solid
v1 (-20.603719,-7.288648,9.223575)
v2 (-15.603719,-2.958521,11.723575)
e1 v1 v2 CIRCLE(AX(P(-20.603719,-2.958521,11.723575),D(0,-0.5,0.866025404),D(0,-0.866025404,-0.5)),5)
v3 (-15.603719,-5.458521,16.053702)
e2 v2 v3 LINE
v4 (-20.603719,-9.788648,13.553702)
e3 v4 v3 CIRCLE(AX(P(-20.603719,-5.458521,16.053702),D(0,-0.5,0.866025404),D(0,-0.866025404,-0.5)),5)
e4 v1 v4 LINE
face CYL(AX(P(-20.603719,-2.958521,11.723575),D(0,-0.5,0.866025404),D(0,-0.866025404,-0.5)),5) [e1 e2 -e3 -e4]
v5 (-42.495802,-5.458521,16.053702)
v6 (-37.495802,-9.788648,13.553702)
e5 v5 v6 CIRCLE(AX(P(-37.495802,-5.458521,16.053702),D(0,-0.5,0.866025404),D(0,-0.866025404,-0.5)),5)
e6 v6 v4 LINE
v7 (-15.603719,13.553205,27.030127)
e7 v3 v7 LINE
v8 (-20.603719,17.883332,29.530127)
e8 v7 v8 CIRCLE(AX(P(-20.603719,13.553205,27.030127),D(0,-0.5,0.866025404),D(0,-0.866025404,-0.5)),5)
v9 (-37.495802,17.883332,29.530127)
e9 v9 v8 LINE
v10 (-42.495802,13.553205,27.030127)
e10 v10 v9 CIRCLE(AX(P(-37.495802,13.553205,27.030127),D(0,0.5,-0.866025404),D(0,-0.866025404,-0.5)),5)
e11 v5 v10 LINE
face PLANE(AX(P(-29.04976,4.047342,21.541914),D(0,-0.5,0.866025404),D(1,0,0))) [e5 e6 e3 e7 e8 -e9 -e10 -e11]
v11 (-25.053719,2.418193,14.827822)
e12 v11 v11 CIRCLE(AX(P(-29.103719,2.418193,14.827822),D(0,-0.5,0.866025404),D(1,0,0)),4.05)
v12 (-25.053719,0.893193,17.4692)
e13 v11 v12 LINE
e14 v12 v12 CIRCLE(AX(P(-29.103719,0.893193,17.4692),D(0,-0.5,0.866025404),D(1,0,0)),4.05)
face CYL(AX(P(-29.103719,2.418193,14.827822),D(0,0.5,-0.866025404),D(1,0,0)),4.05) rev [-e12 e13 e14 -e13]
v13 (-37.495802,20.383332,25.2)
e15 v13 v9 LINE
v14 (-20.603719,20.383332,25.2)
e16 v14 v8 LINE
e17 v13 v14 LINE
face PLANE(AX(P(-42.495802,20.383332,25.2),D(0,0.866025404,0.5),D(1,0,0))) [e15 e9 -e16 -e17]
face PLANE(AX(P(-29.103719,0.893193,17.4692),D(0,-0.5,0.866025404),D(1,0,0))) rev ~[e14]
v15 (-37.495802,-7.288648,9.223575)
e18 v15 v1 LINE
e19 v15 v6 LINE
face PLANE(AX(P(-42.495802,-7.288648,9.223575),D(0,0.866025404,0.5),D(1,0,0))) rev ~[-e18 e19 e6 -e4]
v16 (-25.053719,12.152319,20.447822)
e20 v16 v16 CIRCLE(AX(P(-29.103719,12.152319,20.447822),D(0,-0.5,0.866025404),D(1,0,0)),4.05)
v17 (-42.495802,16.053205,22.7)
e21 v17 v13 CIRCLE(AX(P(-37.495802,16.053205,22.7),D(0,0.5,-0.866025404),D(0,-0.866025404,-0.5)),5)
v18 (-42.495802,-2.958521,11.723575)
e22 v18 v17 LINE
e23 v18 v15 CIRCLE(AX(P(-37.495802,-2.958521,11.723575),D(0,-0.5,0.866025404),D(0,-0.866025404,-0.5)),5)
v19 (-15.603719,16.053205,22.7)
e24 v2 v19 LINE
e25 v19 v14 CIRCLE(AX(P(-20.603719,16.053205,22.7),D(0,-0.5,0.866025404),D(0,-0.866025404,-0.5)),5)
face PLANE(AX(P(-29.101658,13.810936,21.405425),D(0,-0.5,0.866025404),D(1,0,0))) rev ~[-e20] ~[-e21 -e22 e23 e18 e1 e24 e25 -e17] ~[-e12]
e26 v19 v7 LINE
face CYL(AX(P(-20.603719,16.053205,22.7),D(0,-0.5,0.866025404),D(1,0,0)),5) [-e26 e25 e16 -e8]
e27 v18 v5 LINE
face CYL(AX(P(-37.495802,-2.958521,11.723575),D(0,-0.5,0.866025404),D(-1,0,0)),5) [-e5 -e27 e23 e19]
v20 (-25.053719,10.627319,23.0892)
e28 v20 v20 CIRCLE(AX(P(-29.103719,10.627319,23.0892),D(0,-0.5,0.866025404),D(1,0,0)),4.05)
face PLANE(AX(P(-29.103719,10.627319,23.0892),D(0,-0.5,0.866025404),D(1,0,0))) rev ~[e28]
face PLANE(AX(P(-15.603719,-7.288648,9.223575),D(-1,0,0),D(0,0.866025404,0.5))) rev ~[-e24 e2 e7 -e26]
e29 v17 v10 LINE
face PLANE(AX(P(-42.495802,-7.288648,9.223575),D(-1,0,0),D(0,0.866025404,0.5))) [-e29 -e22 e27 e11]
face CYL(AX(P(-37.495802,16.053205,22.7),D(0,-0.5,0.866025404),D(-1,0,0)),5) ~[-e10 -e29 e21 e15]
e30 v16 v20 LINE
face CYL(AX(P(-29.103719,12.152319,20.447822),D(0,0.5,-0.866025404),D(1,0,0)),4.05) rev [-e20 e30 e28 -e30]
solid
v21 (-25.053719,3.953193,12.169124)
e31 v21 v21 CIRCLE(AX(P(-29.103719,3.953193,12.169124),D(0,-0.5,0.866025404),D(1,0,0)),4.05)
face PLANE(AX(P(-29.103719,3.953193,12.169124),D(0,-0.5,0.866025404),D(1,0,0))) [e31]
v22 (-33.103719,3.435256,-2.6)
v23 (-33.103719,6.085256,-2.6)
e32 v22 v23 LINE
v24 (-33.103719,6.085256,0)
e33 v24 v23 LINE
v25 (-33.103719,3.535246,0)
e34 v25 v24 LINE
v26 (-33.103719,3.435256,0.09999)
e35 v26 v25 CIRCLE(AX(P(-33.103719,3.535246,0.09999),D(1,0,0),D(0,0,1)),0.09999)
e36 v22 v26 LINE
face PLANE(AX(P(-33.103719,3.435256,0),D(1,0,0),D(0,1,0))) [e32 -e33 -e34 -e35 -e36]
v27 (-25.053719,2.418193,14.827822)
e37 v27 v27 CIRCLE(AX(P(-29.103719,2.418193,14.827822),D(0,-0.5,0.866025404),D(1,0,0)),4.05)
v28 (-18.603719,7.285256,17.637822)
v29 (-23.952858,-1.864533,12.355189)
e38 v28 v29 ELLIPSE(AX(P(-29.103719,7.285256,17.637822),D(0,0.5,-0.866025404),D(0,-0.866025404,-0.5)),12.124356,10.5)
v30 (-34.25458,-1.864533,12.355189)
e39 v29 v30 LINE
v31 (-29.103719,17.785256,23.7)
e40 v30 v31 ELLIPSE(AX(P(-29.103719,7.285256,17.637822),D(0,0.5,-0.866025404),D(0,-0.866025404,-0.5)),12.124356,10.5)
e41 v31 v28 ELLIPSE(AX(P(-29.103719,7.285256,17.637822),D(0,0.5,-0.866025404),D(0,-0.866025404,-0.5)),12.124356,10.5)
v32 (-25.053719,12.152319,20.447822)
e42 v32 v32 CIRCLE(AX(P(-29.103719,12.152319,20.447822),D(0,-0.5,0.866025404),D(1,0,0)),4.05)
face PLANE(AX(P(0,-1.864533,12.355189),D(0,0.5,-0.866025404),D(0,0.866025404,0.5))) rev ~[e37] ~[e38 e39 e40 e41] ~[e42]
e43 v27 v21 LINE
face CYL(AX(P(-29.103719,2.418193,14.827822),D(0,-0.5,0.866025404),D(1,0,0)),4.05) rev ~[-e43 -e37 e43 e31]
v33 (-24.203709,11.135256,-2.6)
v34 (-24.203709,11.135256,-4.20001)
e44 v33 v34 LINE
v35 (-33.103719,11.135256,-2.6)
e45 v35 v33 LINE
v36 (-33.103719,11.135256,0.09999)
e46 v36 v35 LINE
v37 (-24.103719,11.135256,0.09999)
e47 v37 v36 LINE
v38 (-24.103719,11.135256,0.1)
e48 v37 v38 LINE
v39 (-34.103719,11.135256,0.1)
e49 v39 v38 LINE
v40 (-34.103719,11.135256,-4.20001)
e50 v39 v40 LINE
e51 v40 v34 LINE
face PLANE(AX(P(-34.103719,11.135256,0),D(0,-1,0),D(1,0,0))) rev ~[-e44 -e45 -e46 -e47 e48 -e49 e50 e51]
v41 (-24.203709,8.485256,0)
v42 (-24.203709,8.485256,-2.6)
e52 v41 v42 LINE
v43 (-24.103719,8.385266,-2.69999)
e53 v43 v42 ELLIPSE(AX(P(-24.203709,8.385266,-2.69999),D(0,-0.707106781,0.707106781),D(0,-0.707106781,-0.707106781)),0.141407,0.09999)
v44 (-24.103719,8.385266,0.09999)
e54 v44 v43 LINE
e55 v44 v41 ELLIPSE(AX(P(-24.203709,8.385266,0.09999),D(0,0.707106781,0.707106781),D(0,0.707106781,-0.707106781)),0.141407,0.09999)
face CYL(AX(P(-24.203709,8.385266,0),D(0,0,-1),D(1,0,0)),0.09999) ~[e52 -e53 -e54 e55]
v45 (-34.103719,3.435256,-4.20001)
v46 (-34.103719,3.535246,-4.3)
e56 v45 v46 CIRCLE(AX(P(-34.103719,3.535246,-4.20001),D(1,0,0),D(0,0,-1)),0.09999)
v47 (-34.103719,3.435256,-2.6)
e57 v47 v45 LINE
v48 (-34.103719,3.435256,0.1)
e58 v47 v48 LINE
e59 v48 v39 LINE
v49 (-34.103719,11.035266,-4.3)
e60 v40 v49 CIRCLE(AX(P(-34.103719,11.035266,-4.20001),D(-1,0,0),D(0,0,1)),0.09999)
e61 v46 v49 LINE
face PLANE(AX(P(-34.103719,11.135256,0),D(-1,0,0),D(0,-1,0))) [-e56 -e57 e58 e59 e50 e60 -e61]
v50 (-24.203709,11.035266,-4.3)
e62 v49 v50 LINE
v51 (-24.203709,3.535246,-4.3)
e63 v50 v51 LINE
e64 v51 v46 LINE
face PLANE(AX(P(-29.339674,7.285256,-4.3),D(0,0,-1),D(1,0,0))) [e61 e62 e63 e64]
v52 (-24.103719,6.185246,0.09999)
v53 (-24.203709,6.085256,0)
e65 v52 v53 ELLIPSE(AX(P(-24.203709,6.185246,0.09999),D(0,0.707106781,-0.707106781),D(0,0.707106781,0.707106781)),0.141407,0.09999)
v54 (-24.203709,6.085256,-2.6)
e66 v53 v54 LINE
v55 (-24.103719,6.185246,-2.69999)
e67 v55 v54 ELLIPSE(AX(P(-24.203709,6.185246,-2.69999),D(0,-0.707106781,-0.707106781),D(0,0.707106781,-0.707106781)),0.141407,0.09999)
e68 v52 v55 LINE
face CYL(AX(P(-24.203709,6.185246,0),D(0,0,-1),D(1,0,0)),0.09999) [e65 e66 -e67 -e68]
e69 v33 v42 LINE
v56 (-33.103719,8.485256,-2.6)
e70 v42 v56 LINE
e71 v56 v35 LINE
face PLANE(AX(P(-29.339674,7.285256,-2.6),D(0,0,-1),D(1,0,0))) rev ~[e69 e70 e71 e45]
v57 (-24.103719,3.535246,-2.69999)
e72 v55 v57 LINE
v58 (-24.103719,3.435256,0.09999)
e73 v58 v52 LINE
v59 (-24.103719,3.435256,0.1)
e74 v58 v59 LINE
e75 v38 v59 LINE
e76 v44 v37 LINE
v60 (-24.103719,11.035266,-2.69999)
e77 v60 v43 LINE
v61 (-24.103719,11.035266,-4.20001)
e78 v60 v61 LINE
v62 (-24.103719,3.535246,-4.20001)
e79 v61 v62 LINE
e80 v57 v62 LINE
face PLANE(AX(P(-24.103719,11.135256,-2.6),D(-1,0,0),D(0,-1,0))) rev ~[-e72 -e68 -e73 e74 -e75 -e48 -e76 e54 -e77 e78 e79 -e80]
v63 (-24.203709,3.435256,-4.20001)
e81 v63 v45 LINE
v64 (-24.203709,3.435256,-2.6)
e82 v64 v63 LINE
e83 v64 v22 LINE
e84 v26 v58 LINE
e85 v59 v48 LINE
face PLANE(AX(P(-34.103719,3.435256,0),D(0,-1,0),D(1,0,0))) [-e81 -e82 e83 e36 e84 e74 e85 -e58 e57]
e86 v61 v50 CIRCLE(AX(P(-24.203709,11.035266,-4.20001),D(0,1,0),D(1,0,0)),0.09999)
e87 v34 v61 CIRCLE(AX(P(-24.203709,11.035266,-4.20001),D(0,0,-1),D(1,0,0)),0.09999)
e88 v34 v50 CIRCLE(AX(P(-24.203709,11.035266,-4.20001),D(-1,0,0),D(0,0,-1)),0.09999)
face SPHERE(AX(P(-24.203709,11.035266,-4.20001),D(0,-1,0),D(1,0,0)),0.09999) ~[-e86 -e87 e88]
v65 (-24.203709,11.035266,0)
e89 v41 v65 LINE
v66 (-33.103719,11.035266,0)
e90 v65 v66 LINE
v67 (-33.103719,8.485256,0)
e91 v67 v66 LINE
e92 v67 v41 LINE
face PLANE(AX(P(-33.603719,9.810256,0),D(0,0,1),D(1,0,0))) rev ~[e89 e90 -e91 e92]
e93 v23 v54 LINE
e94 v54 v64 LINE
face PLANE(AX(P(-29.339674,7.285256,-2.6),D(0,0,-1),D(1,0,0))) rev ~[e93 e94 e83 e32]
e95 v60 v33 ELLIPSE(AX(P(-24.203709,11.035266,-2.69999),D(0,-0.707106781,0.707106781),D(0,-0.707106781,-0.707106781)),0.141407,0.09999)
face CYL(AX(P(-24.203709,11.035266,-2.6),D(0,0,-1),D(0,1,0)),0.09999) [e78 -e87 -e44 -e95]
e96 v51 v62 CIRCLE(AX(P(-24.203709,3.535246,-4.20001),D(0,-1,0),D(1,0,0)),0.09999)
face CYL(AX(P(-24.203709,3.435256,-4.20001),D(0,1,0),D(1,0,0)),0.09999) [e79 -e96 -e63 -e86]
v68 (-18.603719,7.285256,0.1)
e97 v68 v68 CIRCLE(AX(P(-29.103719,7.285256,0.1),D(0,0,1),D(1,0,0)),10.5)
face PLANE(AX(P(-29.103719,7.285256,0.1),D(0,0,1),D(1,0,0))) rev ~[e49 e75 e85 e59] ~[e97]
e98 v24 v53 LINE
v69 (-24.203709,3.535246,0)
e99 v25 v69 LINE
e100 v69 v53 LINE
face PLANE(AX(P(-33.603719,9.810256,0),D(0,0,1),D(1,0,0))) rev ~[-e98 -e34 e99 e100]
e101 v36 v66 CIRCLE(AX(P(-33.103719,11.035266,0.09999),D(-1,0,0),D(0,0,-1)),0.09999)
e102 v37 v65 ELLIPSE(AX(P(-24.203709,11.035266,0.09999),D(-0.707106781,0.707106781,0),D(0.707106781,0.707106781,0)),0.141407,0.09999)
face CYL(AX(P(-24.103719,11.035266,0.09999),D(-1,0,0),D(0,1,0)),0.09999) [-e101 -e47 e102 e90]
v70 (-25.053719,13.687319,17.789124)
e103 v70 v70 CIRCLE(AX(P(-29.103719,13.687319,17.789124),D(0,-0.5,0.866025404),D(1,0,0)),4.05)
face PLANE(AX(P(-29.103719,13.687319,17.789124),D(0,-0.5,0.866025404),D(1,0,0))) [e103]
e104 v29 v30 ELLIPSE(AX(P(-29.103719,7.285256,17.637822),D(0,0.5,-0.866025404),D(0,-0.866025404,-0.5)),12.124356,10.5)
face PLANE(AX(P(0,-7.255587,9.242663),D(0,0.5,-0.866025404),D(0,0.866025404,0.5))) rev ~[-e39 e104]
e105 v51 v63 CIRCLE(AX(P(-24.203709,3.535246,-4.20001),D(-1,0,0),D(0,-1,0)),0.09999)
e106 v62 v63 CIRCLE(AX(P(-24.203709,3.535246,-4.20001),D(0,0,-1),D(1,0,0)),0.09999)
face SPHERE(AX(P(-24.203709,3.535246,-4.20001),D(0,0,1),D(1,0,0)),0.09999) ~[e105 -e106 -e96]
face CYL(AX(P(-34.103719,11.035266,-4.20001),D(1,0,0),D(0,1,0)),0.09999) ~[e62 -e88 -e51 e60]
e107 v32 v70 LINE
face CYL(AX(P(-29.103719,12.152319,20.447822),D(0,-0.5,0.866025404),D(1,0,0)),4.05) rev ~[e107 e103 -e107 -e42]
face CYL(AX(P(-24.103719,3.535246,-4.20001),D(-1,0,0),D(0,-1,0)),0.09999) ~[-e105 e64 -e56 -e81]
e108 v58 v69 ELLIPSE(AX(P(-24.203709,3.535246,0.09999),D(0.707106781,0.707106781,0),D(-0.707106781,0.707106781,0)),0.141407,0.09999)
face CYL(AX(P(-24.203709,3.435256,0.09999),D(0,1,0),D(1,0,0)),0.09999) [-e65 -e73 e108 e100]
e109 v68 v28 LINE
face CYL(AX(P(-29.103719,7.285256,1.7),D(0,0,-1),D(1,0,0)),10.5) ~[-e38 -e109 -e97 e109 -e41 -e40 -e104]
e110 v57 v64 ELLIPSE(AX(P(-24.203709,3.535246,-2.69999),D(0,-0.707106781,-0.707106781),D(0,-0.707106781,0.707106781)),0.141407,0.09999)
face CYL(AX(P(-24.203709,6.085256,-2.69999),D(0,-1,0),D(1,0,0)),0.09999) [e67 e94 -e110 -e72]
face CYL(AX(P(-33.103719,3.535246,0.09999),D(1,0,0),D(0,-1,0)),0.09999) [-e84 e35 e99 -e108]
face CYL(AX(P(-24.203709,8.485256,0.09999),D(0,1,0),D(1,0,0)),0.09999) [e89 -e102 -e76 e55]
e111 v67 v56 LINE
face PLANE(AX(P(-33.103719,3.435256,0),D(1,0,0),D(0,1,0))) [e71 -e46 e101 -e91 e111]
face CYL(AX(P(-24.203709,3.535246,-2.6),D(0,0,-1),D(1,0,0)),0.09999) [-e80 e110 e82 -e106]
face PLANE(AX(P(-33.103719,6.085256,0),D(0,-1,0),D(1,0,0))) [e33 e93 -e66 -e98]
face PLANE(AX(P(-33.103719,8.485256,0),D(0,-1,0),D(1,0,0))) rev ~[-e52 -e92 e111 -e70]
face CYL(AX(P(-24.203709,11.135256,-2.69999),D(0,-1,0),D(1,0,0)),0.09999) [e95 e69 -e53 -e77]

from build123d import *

# Parameters (mm, degrees)
F0_W           = 1
F0_H           = 2.65
F0_H_2         = 2.4
F0_W_2         = 9
F1_DEPTH       = 1.7
F2_DEPTH       = 4.3
F3_START       = 2.6
F3_DEPTH       = 1.7
F4_DEPTH       = 2.6
F5_START       = 0.1
F0_R           = 10.5
F5_DEPTH       = 1.6
F6_R           = 0.09999
F7_R           = 10.5
F8_DEPTH       = 22
F10_DEPTH      = 39.6047188237
F10_DEPTH_BACK = 25
F11_R          = 4.05
F12_DEPTH      = 3.07
F13_W          = 26.8920833189
F13_H          = 31.9528504953
F14_DEPTH      = 5
F13_R          = 4.05
F15_DEPTH      = 3.05
F16_START      = 3.05
F16_DEPTH      = 1.95
F17_R          = 5


# Not quite as in the source:
# - a fillet or chamfer is up to 0.001 mm smaller than in the source, because OpenCascade refuses the exact size


with BuildPart() as f1:
    # F0 (on Top) → F1 (new body)
    with BuildSketch(Plane.XY):
        with Locations((-33.6037188237, 9.8102559388)):
            Rectangle(F0_W, F0_H)
        with Locations((-33.6037188237, 7.2852559388)):
            Rectangle(F0_W, F0_H_2)
        with Locations((-28.6037188237, 9.8102559388)):
            Rectangle(F0_W_2, F0_H)
        with Locations((-28.6037188237, 7.2852559388)):
            Rectangle(F0_W_2, F0_H_2)
        with Locations((-28.6037188237, 4.7602559388)):
            Rectangle(F0_W_2, F0_H)
        with Locations((-33.6037188237, 4.7602559388)):
            Rectangle(F0_W, F0_H)
    extrude(amount=F1_DEPTH)

    # F0 (on Top) → F2 (join)
    with BuildSketch(Plane.XY):
        with Locations((-28.6037188237, 7.2852559388)):
            Rectangle(F0_W_2, F0_H_2)
    extrude(amount=-F2_DEPTH)

    # F1_face (on face) → F3 (join)
    with BuildSketch(Plane(origin=(-29.298664672, 7.2852559388, 0), x_dir=(1, 0, 0), z_dir=(0, 0, -1)).offset(F3_START)):
        Polygon((-4.8050541516, -3.85), (5.1949458484, -3.85), (5.1949458484, -1.2), (-3.8050541516, -1.2), (-3.8050541516, 1.2), (5.1949458484, 1.2), (5.1949458484, 3.85), (-4.8050541516, 3.85), align=None)
    extrude(amount=F3_DEPTH)

    # F0 (on Top) → F4 (join, through all)
    with BuildSketch(Plane.XY):
        with Locations((-33.6037188237, 9.8102559388)):
            Rectangle(F0_W, F0_H)
        with Locations((-33.6037188237, 7.2852559388)):
            Rectangle(F0_W, F0_H_2)
        with Locations((-33.6037188237, 4.7602559388)):
            Rectangle(F0_W, F0_H)
    extrude(amount=-F4_DEPTH)

    # F0 (on Top) → F5 (join)
    with BuildSketch(Plane.XY.offset(F5_START)):
        with Locations((-29.1037188237, 7.2852559388)):
            Circle(F0_R)
        Polygon((-34.1037188237, 8.4852559388), (-34.1037188237, 11.1352559388), (-33.1037188237, 11.1352559388), (-24.1037188237, 11.1352559388), (-24.1037188237, 8.4852559388), (-24.1037188237, 6.0852559388), (-24.1037188237, 3.4352559388), (-33.1037188237, 3.4352559388), (-34.1037188237, 3.4352559388), (-34.1037188237, 6.0852559388), align=None, mode=Mode.SUBTRACT)
    extrude(amount=F5_DEPTH)

    # F6 (radius 0.1 in the source; OpenCascade refuses exactly that, so slightly less here)
    f6_edges = [f1.edges().sort_by_distance(p)[0] for p in [
        (-24.103719, 4.760256, 0),
        (-24.103719, 9.810256, 0),
        (-24.103719, 6.085256, -1.3),
        (-24.103719, 8.485256, -1.3),
        (-24.103719, 9.810256, -2.6),
        (-24.103719, 4.760256, -2.6),
        (-24.103719, 3.435256, -3.45),
        (-24.103719, 7.285256, -4.3),
        (-24.103719, 11.135256, -3.45),
        (-28.603719, 3.435256, 0),
        (-28.603719, 11.135256, 0),
        (-29.103719, 3.435256, -4.3),
        (-29.103719, 11.135256, -4.3),
    ]]
    fillet(f6_edges, radius=F6_R)

    # F7 (on face) → F8 (join)
    with BuildSketch(Plane.XY.offset(1.7)):
        with Locations((-29.1037188237, 7.2852559388)):
            Circle(F7_R)
    extrude(amount=F8_DEPTH)

    # F9 (on Right) → F10 (cut, two sides)
    with BuildSketch(Plane.YZ) as f10_sk:
        Polygon((17.7852559388, 23.7), (-3.2147440612, 23.7), (-7.2555868058, 9.2426627007), (-1.8645326524, 12.3551892673), align=None)
    extrude(amount=-F10_DEPTH, mode=Mode.SUBTRACT)
    extrude(f10_sk.sketch, amount=F10_DEPTH_BACK, mode=Mode.SUBTRACT)

    # F11 (on face) → F12 (cut)
    with BuildSketch(Plane(origin=(0, -5.8160870502, 10.0737582721), x_dir=(1, 0, 0), z_dir=(0, -0.5, 0.8660254038))):
        with Locations((-29.1037188237, 9.5081278028)):
            Circle(F11_R)
        with Locations((-29.1037188237, 20.7481278028)):
            Circle(F11_R)
    extrude(amount=-F12_DEPTH, mode=Mode.SUBTRACT)


with BuildPart() as f14:
    # F13 (on face) → F14 (new body)
    with BuildSketch(Plane(origin=(0, -5.8160870502, 10.0737582721), x_dir=(1, 0, 0), z_dir=(0, -0.5, 0.8660254038))):
        with Locations((-29.0497604831, 14.2760582082)):
            Rectangle(F13_W, F13_H)
        with BuildLine():
            Line((-18.6037188237, 1.2996329605), (-39.4958021426, 1.2996329605))
            Line((-39.4958021426, 1.2996329605), (-39.4958021426, 13.2724569986))
            add(Edge.make_bspline(
                [(-39.6037188237, 15.1281280197), (-39.6037188363, 14.1954998359), (-39.4958021426, 13.2724569986)],
                knots=[4.7123889637, 4.7123889637, 4.7123889637, 4.8674305263, 4.8674305263, 4.8674305263], degree=2, weights=[1, 0.9710906997, 0.9478882411]))
            add(Edge.make_bspline(
                [(-39.4958021426, 16.983798607), (-39.603718811, 16.0607559855), (-39.6037188237, 15.1281280197)],
                knots=[4.5573474366, 4.5573474366, 4.5573474366, 4.7123889637, 4.7123889637, 4.7123889637], degree=2, weights=[0.9478882526, 0.9710907067, 1]))
            Line((-39.4958021426, 16.983798607), (-39.4958021426, 27.2524834558))
            Line((-39.4958021426, 27.2524834558), (-32.8458187492, 27.2524834558))
            add(Edge.make_bspline(
                [(-25.3616188981, 27.2524834558), (-27.1691542693, 28.1045530304), (-29.1037187359, 28.1045530504), (-31.0382832932, 28.1045530704), (-32.8458187492, 27.2524834558)],
                knots=[2.7613255041, 2.7613255041, 2.7613255041, 3.1415926452, 3.1415926452, 3.521859803, 3.521859803, 3.521859803], degree=2, weights=[0.8925198158, 0.9290947753, 1, 0.9290947722, 0.8925198127]))
            Line((-25.3616188981, 27.2524834558), (-18.6037188237, 27.2524834558))
            Line((-18.6037188237, 27.2524834558), (-18.6037188237, 15.1281278028))
            Line((-18.6037188237, 15.1281278028), (-18.6037188237, 1.2996329605))
        make_face(mode=Mode.SUBTRACT)
        with BuildLine():
            Line((-39.4958021426, 13.2724569986), (-39.4958021426, 1.2996329605))
            Line((-39.4958021426, 1.2996329605), (-18.6037188237, 1.2996329605))
            Line((-18.6037188237, 1.2996329605), (-18.6037188237, 15.1281278028))
            add(Edge.make_bspline(
                [(-29.1037188237, 2.1517025552), (-18.6037188237, 2.1517025552), (-18.6037188237, 15.1281278028)],
                knots=[0, 0, 0, 1.5707963268, 1.5707963268, 1.5707963268], degree=2, weights=[1, 0.7071067812, 1]))
            add(Edge.make_bspline(
                [(-39.4958021426, 13.2724569986), (-38.1956294939, 2.1517025552), (-29.1037188237, 2.1517025552)],
                knots=[4.8674305263, 4.8674305263, 4.8674305263, 6.2831853072, 6.2831853072, 6.2831853072], degree=2, weights=[0.9478882411, 0.7360160756, 1]))
        make_face()
        with BuildLine():
            add(Edge.make_bspline(
                [(-18.6037188237, 15.1281278028), (-18.6037188237, 24.0668190788), (-25.3616188981, 27.2524834558)],
                knots=[1.5707963268, 1.5707963268, 1.5707963268, 2.7613255041, 2.7613255041, 2.7613255041], degree=2, weights=[1, 0.7780120088, 0.8925198158]))
            Line((-18.6037188237, 15.1281278028), (-18.6037188237, 27.2524834558))
            Line((-18.6037188237, 27.2524834558), (-25.3616188981, 27.2524834558))
        make_face()
        with BuildLine():
            Line((-39.4958021426, 27.2524834558), (-39.4958021426, 16.983798607))
            add(Edge.make_bspline(
                [(-32.8458187492, 27.2524834558), (-38.6131013788, 24.5337947178), (-39.4958021426, 16.983798607)],
                knots=[3.521859803, 3.521859803, 3.521859803, 4.5573474366, 4.5573474366, 4.5573474366], degree=2, weights=[0.8925198127, 0.7929242584, 0.9478882526]))
            Line((-32.8458187492, 27.2524834558), (-39.4958021426, 27.2524834558))
        make_face()
    extrude(amount=F14_DEPTH)

    # F13 (on face) → F14, piece 2 (join)
    with BuildSketch(Plane(origin=(0, -5.8160870502, 10.0737582721), x_dir=(1, 0, 0), z_dir=(0, -0.5, 0.8660254038))):
        with BuildLine():
            add(Edge.make_bspline(
                [(-18.6037188237, 15.1281278028), (-18.6037188237, -14.1426560497), (-36.5283400261, 6.5549137031), (-38.9966235925, 9.4050420661), (-39.4958021426, 13.394305708)],
                knots=[4.7123889804, 4.7123889804, 4.7123889804, 7.0685834706, 7.0685834706, 7.7623255267, 7.7623255267, 7.7623255267], degree=2, weights=[1, 0.3826834324, 1, 0.8182414624, 0.7435144471]))
            add(Edge.make_bspline(
                [(-29.1037188237, 27.2524834558), (-18.6037188237, 27.2524834558), (-18.6037188237, 15.1281278028)],
                knots=[3.1415926536, 3.1415926536, 3.1415926536, 4.7123889804, 4.7123889804, 4.7123889804], degree=2, weights=[1, 0.7071067812, 1]))
            add(Edge.make_bspline(
                [(-39.4958021426, 16.8619498976), (-38.1956294939, 27.2524834558), (-29.1037188237, 27.2524834558)],
                knots=[8.0258450855, 8.0258450855, 8.0258450855, 9.4247779608, 9.4247779608, 9.4247779608], degree=2, weights=[0.7021873252, 0.6334833799, 1]))
            Line((-39.4958021426, 16.8619498976), (-39.4958021426, 13.394305708))
        make_face()
        with Locations((-29.1037188237, 9.5081278028)):
            Circle(F13_R, mode=Mode.SUBTRACT)
        with Locations((-29.1037188237, 20.7481278028)):
            Circle(F13_R, mode=Mode.SUBTRACT)
        with BuildLine():
            add(Edge.make_bspline(
                [(-39.4958021426, 13.394305708), (-39.6037188372, 14.2567388914), (-39.6037188237, 15.1281280197)],
                knots=[7.7623255267, 7.7623255267, 7.7623255267, 7.8959689632, 7.8959689632, 7.8959689632], degree=2, weights=[0.7435144471, 0.7291189307, 0.7186954298]))
            Line((-39.4958021426, 13.394305708), (-39.4958021426, 16.8619498976))
            add(Edge.make_bspline(
                [(-39.6037188237, 15.1281280197), (-39.6037188102, 15.99951693), (-39.4958021426, 16.8619498976)],
                knots=[7.8959689632, 7.8959689632, 7.8959689632, 8.0258450855, 8.0258450855, 8.0258450855], degree=2, weights=[0.7186954298, 0.70856576, 0.7021873252]))
        make_face()
    extrude(amount=F14_DEPTH)

    # F11 (on face) → F15 (join)
    with BuildSketch(Plane(origin=(0, -5.8160870502, 10.0737582721), x_dir=(1, 0, 0), z_dir=(0, -0.5, 0.8660254038))):
        with BuildLine():
            add(Edge.make_bspline(
                [(-29.1037188237, 27.2524834558), (-18.6037188237, 27.2524834558), (-18.6037188237, 15.1281278028)],
                knots=[3.1415926536, 3.1415926536, 3.1415926536, 4.7123889804, 4.7123889804, 4.7123889804], degree=2, weights=[1, 0.7071067812, 1]))
            add(Edge.make_bspline(
                [(-18.6037188237, 15.1281278028), (-18.6037188237, 28.104552942), (-29.1037187359, 28.1045530504), (-39.6037186481, 28.1045531589), (-39.6037188237, 15.1281280197)],
                knots=[1.5707963268, 1.5707963268, 1.5707963268, 3.1415926452, 3.1415926452, 4.7123889637, 4.7123889637, 4.7123889637], degree=2, weights=[1, 0.7071067841, 1, 0.7071067841, 1]))
            add(Edge.make_bspline(
                [(-39.6037188237, 15.1281280197), (-39.6037186358, 27.2524834558), (-29.1037188237, 27.2524834558)],
                knots=[7.8959689632, 7.8959689632, 7.8959689632, 9.4247779608, 9.4247779608, 9.4247779608], degree=2, weights=[0.7186954298, 0.599456188, 1]))
        make_face()
        with BuildLine():
            add(Edge.make_bspline(
                [(-39.6037188237, 15.1281280197), (-39.6037189992, 2.1517025552), (-29.1037188237, 2.1517025552)],
                knots=[4.7123889637, 4.7123889637, 4.7123889637, 6.2831853072, 6.2831853072, 6.2831853072], degree=2, weights=[1, 0.7071067753, 1]))
            add(Edge.make_bspline(
                [(-29.1037188237, 2.1517025552), (-18.6037188237, 2.1517025552), (-18.6037188237, 15.1281278028)],
                knots=[0, 0, 0, 1.5707963268, 1.5707963268, 1.5707963268], degree=2, weights=[1, 0.7071067812, 1]))
            add(Edge.make_bspline(
                [(-18.6037188237, 15.1281278028), (-18.6037188237, -14.1426560497), (-36.5283400261, 6.5549137031), (-39.6037189015, 10.1060553462), (-39.6037188237, 15.1281280197)],
                knots=[4.7123889804, 4.7123889804, 4.7123889804, 7.0685834706, 7.0685834706, 7.8959689632, 7.8959689632, 7.8959689632], degree=2, weights=[1, 0.3826834324, 1, 0.7832272444, 0.7186954298]))
        make_face()
    extrude(amount=F15_DEPTH)

    # F11 (on face) → F16 (join)
    with BuildSketch(Plane(origin=(0, -5.8160870502, 10.0737582721), x_dir=(1, 0, 0), z_dir=(0, -0.5, 0.8660254038)).offset(F16_START)):
        with Locations((-29.1037188237, 20.7481278028)):
            Circle(F11_R)
        with Locations((-29.1037188237, 9.5081278028)):
            Circle(F11_R)
        with BuildLine():
            add(Edge.make_bspline(
                [(-29.1037188237, 27.2524834558), (-18.6037188237, 27.2524834558), (-18.6037188237, 15.1281278028)],
                knots=[3.1415926536, 3.1415926536, 3.1415926536, 4.7123889804, 4.7123889804, 4.7123889804], degree=2, weights=[1, 0.7071067812, 1]))
            add(Edge.make_bspline(
                [(-18.6037188237, 15.1281278028), (-18.6037188237, 28.104552942), (-29.1037187359, 28.1045530504), (-39.6037186481, 28.1045531589), (-39.6037188237, 15.1281280197)],
                knots=[1.5707963268, 1.5707963268, 1.5707963268, 3.1415926452, 3.1415926452, 4.7123889637, 4.7123889637, 4.7123889637], degree=2, weights=[1, 0.7071067841, 1, 0.7071067841, 1]))
            add(Edge.make_bspline(
                [(-39.6037188237, 15.1281280197), (-39.6037186358, 27.2524834558), (-29.1037188237, 27.2524834558)],
                knots=[7.8959689632, 7.8959689632, 7.8959689632, 9.4247779608, 9.4247779608, 9.4247779608], degree=2, weights=[0.7186954298, 0.599456188, 1]))
        make_face()
        with BuildLine():
            add(Edge.make_bspline(
                [(-39.6037188237, 15.1281280197), (-39.6037189992, 2.1517025552), (-29.1037188237, 2.1517025552)],
                knots=[4.7123889637, 4.7123889637, 4.7123889637, 6.2831853072, 6.2831853072, 6.2831853072], degree=2, weights=[1, 0.7071067753, 1]))
            add(Edge.make_bspline(
                [(-29.1037188237, 2.1517025552), (-18.6037188237, 2.1517025552), (-18.6037188237, 15.1281278028)],
                knots=[0, 0, 0, 1.5707963268, 1.5707963268, 1.5707963268], degree=2, weights=[1, 0.7071067812, 1]))
            add(Edge.make_bspline(
                [(-18.6037188237, 15.1281278028), (-18.6037188237, -14.1426560497), (-36.5283400261, 6.5549137031), (-39.6037189015, 10.1060553462), (-39.6037188237, 15.1281280197)],
                knots=[4.7123889804, 4.7123889804, 4.7123889804, 7.0685834706, 7.0685834706, 7.8959689632, 7.8959689632, 7.8959689632], degree=2, weights=[1, 0.3826834324, 1, 0.7832272444, 0.7186954298]))
        make_face()
    extrude(amount=F16_DEPTH)

    # F17
    f17_edges = [f14.edges().sort_by_distance(p)[0] for p in [
        (-42.495802, -8.538648, 11.388638),
        (-42.495802, 19.133332, 27.365064),
        (-15.603719, 19.133332, 27.365064),
        (-15.603719, -8.538648, 11.388638),
    ]]
    fillet(f17_edges, radius=F17_R)


solid = Compound([f1.part, f14.part])
